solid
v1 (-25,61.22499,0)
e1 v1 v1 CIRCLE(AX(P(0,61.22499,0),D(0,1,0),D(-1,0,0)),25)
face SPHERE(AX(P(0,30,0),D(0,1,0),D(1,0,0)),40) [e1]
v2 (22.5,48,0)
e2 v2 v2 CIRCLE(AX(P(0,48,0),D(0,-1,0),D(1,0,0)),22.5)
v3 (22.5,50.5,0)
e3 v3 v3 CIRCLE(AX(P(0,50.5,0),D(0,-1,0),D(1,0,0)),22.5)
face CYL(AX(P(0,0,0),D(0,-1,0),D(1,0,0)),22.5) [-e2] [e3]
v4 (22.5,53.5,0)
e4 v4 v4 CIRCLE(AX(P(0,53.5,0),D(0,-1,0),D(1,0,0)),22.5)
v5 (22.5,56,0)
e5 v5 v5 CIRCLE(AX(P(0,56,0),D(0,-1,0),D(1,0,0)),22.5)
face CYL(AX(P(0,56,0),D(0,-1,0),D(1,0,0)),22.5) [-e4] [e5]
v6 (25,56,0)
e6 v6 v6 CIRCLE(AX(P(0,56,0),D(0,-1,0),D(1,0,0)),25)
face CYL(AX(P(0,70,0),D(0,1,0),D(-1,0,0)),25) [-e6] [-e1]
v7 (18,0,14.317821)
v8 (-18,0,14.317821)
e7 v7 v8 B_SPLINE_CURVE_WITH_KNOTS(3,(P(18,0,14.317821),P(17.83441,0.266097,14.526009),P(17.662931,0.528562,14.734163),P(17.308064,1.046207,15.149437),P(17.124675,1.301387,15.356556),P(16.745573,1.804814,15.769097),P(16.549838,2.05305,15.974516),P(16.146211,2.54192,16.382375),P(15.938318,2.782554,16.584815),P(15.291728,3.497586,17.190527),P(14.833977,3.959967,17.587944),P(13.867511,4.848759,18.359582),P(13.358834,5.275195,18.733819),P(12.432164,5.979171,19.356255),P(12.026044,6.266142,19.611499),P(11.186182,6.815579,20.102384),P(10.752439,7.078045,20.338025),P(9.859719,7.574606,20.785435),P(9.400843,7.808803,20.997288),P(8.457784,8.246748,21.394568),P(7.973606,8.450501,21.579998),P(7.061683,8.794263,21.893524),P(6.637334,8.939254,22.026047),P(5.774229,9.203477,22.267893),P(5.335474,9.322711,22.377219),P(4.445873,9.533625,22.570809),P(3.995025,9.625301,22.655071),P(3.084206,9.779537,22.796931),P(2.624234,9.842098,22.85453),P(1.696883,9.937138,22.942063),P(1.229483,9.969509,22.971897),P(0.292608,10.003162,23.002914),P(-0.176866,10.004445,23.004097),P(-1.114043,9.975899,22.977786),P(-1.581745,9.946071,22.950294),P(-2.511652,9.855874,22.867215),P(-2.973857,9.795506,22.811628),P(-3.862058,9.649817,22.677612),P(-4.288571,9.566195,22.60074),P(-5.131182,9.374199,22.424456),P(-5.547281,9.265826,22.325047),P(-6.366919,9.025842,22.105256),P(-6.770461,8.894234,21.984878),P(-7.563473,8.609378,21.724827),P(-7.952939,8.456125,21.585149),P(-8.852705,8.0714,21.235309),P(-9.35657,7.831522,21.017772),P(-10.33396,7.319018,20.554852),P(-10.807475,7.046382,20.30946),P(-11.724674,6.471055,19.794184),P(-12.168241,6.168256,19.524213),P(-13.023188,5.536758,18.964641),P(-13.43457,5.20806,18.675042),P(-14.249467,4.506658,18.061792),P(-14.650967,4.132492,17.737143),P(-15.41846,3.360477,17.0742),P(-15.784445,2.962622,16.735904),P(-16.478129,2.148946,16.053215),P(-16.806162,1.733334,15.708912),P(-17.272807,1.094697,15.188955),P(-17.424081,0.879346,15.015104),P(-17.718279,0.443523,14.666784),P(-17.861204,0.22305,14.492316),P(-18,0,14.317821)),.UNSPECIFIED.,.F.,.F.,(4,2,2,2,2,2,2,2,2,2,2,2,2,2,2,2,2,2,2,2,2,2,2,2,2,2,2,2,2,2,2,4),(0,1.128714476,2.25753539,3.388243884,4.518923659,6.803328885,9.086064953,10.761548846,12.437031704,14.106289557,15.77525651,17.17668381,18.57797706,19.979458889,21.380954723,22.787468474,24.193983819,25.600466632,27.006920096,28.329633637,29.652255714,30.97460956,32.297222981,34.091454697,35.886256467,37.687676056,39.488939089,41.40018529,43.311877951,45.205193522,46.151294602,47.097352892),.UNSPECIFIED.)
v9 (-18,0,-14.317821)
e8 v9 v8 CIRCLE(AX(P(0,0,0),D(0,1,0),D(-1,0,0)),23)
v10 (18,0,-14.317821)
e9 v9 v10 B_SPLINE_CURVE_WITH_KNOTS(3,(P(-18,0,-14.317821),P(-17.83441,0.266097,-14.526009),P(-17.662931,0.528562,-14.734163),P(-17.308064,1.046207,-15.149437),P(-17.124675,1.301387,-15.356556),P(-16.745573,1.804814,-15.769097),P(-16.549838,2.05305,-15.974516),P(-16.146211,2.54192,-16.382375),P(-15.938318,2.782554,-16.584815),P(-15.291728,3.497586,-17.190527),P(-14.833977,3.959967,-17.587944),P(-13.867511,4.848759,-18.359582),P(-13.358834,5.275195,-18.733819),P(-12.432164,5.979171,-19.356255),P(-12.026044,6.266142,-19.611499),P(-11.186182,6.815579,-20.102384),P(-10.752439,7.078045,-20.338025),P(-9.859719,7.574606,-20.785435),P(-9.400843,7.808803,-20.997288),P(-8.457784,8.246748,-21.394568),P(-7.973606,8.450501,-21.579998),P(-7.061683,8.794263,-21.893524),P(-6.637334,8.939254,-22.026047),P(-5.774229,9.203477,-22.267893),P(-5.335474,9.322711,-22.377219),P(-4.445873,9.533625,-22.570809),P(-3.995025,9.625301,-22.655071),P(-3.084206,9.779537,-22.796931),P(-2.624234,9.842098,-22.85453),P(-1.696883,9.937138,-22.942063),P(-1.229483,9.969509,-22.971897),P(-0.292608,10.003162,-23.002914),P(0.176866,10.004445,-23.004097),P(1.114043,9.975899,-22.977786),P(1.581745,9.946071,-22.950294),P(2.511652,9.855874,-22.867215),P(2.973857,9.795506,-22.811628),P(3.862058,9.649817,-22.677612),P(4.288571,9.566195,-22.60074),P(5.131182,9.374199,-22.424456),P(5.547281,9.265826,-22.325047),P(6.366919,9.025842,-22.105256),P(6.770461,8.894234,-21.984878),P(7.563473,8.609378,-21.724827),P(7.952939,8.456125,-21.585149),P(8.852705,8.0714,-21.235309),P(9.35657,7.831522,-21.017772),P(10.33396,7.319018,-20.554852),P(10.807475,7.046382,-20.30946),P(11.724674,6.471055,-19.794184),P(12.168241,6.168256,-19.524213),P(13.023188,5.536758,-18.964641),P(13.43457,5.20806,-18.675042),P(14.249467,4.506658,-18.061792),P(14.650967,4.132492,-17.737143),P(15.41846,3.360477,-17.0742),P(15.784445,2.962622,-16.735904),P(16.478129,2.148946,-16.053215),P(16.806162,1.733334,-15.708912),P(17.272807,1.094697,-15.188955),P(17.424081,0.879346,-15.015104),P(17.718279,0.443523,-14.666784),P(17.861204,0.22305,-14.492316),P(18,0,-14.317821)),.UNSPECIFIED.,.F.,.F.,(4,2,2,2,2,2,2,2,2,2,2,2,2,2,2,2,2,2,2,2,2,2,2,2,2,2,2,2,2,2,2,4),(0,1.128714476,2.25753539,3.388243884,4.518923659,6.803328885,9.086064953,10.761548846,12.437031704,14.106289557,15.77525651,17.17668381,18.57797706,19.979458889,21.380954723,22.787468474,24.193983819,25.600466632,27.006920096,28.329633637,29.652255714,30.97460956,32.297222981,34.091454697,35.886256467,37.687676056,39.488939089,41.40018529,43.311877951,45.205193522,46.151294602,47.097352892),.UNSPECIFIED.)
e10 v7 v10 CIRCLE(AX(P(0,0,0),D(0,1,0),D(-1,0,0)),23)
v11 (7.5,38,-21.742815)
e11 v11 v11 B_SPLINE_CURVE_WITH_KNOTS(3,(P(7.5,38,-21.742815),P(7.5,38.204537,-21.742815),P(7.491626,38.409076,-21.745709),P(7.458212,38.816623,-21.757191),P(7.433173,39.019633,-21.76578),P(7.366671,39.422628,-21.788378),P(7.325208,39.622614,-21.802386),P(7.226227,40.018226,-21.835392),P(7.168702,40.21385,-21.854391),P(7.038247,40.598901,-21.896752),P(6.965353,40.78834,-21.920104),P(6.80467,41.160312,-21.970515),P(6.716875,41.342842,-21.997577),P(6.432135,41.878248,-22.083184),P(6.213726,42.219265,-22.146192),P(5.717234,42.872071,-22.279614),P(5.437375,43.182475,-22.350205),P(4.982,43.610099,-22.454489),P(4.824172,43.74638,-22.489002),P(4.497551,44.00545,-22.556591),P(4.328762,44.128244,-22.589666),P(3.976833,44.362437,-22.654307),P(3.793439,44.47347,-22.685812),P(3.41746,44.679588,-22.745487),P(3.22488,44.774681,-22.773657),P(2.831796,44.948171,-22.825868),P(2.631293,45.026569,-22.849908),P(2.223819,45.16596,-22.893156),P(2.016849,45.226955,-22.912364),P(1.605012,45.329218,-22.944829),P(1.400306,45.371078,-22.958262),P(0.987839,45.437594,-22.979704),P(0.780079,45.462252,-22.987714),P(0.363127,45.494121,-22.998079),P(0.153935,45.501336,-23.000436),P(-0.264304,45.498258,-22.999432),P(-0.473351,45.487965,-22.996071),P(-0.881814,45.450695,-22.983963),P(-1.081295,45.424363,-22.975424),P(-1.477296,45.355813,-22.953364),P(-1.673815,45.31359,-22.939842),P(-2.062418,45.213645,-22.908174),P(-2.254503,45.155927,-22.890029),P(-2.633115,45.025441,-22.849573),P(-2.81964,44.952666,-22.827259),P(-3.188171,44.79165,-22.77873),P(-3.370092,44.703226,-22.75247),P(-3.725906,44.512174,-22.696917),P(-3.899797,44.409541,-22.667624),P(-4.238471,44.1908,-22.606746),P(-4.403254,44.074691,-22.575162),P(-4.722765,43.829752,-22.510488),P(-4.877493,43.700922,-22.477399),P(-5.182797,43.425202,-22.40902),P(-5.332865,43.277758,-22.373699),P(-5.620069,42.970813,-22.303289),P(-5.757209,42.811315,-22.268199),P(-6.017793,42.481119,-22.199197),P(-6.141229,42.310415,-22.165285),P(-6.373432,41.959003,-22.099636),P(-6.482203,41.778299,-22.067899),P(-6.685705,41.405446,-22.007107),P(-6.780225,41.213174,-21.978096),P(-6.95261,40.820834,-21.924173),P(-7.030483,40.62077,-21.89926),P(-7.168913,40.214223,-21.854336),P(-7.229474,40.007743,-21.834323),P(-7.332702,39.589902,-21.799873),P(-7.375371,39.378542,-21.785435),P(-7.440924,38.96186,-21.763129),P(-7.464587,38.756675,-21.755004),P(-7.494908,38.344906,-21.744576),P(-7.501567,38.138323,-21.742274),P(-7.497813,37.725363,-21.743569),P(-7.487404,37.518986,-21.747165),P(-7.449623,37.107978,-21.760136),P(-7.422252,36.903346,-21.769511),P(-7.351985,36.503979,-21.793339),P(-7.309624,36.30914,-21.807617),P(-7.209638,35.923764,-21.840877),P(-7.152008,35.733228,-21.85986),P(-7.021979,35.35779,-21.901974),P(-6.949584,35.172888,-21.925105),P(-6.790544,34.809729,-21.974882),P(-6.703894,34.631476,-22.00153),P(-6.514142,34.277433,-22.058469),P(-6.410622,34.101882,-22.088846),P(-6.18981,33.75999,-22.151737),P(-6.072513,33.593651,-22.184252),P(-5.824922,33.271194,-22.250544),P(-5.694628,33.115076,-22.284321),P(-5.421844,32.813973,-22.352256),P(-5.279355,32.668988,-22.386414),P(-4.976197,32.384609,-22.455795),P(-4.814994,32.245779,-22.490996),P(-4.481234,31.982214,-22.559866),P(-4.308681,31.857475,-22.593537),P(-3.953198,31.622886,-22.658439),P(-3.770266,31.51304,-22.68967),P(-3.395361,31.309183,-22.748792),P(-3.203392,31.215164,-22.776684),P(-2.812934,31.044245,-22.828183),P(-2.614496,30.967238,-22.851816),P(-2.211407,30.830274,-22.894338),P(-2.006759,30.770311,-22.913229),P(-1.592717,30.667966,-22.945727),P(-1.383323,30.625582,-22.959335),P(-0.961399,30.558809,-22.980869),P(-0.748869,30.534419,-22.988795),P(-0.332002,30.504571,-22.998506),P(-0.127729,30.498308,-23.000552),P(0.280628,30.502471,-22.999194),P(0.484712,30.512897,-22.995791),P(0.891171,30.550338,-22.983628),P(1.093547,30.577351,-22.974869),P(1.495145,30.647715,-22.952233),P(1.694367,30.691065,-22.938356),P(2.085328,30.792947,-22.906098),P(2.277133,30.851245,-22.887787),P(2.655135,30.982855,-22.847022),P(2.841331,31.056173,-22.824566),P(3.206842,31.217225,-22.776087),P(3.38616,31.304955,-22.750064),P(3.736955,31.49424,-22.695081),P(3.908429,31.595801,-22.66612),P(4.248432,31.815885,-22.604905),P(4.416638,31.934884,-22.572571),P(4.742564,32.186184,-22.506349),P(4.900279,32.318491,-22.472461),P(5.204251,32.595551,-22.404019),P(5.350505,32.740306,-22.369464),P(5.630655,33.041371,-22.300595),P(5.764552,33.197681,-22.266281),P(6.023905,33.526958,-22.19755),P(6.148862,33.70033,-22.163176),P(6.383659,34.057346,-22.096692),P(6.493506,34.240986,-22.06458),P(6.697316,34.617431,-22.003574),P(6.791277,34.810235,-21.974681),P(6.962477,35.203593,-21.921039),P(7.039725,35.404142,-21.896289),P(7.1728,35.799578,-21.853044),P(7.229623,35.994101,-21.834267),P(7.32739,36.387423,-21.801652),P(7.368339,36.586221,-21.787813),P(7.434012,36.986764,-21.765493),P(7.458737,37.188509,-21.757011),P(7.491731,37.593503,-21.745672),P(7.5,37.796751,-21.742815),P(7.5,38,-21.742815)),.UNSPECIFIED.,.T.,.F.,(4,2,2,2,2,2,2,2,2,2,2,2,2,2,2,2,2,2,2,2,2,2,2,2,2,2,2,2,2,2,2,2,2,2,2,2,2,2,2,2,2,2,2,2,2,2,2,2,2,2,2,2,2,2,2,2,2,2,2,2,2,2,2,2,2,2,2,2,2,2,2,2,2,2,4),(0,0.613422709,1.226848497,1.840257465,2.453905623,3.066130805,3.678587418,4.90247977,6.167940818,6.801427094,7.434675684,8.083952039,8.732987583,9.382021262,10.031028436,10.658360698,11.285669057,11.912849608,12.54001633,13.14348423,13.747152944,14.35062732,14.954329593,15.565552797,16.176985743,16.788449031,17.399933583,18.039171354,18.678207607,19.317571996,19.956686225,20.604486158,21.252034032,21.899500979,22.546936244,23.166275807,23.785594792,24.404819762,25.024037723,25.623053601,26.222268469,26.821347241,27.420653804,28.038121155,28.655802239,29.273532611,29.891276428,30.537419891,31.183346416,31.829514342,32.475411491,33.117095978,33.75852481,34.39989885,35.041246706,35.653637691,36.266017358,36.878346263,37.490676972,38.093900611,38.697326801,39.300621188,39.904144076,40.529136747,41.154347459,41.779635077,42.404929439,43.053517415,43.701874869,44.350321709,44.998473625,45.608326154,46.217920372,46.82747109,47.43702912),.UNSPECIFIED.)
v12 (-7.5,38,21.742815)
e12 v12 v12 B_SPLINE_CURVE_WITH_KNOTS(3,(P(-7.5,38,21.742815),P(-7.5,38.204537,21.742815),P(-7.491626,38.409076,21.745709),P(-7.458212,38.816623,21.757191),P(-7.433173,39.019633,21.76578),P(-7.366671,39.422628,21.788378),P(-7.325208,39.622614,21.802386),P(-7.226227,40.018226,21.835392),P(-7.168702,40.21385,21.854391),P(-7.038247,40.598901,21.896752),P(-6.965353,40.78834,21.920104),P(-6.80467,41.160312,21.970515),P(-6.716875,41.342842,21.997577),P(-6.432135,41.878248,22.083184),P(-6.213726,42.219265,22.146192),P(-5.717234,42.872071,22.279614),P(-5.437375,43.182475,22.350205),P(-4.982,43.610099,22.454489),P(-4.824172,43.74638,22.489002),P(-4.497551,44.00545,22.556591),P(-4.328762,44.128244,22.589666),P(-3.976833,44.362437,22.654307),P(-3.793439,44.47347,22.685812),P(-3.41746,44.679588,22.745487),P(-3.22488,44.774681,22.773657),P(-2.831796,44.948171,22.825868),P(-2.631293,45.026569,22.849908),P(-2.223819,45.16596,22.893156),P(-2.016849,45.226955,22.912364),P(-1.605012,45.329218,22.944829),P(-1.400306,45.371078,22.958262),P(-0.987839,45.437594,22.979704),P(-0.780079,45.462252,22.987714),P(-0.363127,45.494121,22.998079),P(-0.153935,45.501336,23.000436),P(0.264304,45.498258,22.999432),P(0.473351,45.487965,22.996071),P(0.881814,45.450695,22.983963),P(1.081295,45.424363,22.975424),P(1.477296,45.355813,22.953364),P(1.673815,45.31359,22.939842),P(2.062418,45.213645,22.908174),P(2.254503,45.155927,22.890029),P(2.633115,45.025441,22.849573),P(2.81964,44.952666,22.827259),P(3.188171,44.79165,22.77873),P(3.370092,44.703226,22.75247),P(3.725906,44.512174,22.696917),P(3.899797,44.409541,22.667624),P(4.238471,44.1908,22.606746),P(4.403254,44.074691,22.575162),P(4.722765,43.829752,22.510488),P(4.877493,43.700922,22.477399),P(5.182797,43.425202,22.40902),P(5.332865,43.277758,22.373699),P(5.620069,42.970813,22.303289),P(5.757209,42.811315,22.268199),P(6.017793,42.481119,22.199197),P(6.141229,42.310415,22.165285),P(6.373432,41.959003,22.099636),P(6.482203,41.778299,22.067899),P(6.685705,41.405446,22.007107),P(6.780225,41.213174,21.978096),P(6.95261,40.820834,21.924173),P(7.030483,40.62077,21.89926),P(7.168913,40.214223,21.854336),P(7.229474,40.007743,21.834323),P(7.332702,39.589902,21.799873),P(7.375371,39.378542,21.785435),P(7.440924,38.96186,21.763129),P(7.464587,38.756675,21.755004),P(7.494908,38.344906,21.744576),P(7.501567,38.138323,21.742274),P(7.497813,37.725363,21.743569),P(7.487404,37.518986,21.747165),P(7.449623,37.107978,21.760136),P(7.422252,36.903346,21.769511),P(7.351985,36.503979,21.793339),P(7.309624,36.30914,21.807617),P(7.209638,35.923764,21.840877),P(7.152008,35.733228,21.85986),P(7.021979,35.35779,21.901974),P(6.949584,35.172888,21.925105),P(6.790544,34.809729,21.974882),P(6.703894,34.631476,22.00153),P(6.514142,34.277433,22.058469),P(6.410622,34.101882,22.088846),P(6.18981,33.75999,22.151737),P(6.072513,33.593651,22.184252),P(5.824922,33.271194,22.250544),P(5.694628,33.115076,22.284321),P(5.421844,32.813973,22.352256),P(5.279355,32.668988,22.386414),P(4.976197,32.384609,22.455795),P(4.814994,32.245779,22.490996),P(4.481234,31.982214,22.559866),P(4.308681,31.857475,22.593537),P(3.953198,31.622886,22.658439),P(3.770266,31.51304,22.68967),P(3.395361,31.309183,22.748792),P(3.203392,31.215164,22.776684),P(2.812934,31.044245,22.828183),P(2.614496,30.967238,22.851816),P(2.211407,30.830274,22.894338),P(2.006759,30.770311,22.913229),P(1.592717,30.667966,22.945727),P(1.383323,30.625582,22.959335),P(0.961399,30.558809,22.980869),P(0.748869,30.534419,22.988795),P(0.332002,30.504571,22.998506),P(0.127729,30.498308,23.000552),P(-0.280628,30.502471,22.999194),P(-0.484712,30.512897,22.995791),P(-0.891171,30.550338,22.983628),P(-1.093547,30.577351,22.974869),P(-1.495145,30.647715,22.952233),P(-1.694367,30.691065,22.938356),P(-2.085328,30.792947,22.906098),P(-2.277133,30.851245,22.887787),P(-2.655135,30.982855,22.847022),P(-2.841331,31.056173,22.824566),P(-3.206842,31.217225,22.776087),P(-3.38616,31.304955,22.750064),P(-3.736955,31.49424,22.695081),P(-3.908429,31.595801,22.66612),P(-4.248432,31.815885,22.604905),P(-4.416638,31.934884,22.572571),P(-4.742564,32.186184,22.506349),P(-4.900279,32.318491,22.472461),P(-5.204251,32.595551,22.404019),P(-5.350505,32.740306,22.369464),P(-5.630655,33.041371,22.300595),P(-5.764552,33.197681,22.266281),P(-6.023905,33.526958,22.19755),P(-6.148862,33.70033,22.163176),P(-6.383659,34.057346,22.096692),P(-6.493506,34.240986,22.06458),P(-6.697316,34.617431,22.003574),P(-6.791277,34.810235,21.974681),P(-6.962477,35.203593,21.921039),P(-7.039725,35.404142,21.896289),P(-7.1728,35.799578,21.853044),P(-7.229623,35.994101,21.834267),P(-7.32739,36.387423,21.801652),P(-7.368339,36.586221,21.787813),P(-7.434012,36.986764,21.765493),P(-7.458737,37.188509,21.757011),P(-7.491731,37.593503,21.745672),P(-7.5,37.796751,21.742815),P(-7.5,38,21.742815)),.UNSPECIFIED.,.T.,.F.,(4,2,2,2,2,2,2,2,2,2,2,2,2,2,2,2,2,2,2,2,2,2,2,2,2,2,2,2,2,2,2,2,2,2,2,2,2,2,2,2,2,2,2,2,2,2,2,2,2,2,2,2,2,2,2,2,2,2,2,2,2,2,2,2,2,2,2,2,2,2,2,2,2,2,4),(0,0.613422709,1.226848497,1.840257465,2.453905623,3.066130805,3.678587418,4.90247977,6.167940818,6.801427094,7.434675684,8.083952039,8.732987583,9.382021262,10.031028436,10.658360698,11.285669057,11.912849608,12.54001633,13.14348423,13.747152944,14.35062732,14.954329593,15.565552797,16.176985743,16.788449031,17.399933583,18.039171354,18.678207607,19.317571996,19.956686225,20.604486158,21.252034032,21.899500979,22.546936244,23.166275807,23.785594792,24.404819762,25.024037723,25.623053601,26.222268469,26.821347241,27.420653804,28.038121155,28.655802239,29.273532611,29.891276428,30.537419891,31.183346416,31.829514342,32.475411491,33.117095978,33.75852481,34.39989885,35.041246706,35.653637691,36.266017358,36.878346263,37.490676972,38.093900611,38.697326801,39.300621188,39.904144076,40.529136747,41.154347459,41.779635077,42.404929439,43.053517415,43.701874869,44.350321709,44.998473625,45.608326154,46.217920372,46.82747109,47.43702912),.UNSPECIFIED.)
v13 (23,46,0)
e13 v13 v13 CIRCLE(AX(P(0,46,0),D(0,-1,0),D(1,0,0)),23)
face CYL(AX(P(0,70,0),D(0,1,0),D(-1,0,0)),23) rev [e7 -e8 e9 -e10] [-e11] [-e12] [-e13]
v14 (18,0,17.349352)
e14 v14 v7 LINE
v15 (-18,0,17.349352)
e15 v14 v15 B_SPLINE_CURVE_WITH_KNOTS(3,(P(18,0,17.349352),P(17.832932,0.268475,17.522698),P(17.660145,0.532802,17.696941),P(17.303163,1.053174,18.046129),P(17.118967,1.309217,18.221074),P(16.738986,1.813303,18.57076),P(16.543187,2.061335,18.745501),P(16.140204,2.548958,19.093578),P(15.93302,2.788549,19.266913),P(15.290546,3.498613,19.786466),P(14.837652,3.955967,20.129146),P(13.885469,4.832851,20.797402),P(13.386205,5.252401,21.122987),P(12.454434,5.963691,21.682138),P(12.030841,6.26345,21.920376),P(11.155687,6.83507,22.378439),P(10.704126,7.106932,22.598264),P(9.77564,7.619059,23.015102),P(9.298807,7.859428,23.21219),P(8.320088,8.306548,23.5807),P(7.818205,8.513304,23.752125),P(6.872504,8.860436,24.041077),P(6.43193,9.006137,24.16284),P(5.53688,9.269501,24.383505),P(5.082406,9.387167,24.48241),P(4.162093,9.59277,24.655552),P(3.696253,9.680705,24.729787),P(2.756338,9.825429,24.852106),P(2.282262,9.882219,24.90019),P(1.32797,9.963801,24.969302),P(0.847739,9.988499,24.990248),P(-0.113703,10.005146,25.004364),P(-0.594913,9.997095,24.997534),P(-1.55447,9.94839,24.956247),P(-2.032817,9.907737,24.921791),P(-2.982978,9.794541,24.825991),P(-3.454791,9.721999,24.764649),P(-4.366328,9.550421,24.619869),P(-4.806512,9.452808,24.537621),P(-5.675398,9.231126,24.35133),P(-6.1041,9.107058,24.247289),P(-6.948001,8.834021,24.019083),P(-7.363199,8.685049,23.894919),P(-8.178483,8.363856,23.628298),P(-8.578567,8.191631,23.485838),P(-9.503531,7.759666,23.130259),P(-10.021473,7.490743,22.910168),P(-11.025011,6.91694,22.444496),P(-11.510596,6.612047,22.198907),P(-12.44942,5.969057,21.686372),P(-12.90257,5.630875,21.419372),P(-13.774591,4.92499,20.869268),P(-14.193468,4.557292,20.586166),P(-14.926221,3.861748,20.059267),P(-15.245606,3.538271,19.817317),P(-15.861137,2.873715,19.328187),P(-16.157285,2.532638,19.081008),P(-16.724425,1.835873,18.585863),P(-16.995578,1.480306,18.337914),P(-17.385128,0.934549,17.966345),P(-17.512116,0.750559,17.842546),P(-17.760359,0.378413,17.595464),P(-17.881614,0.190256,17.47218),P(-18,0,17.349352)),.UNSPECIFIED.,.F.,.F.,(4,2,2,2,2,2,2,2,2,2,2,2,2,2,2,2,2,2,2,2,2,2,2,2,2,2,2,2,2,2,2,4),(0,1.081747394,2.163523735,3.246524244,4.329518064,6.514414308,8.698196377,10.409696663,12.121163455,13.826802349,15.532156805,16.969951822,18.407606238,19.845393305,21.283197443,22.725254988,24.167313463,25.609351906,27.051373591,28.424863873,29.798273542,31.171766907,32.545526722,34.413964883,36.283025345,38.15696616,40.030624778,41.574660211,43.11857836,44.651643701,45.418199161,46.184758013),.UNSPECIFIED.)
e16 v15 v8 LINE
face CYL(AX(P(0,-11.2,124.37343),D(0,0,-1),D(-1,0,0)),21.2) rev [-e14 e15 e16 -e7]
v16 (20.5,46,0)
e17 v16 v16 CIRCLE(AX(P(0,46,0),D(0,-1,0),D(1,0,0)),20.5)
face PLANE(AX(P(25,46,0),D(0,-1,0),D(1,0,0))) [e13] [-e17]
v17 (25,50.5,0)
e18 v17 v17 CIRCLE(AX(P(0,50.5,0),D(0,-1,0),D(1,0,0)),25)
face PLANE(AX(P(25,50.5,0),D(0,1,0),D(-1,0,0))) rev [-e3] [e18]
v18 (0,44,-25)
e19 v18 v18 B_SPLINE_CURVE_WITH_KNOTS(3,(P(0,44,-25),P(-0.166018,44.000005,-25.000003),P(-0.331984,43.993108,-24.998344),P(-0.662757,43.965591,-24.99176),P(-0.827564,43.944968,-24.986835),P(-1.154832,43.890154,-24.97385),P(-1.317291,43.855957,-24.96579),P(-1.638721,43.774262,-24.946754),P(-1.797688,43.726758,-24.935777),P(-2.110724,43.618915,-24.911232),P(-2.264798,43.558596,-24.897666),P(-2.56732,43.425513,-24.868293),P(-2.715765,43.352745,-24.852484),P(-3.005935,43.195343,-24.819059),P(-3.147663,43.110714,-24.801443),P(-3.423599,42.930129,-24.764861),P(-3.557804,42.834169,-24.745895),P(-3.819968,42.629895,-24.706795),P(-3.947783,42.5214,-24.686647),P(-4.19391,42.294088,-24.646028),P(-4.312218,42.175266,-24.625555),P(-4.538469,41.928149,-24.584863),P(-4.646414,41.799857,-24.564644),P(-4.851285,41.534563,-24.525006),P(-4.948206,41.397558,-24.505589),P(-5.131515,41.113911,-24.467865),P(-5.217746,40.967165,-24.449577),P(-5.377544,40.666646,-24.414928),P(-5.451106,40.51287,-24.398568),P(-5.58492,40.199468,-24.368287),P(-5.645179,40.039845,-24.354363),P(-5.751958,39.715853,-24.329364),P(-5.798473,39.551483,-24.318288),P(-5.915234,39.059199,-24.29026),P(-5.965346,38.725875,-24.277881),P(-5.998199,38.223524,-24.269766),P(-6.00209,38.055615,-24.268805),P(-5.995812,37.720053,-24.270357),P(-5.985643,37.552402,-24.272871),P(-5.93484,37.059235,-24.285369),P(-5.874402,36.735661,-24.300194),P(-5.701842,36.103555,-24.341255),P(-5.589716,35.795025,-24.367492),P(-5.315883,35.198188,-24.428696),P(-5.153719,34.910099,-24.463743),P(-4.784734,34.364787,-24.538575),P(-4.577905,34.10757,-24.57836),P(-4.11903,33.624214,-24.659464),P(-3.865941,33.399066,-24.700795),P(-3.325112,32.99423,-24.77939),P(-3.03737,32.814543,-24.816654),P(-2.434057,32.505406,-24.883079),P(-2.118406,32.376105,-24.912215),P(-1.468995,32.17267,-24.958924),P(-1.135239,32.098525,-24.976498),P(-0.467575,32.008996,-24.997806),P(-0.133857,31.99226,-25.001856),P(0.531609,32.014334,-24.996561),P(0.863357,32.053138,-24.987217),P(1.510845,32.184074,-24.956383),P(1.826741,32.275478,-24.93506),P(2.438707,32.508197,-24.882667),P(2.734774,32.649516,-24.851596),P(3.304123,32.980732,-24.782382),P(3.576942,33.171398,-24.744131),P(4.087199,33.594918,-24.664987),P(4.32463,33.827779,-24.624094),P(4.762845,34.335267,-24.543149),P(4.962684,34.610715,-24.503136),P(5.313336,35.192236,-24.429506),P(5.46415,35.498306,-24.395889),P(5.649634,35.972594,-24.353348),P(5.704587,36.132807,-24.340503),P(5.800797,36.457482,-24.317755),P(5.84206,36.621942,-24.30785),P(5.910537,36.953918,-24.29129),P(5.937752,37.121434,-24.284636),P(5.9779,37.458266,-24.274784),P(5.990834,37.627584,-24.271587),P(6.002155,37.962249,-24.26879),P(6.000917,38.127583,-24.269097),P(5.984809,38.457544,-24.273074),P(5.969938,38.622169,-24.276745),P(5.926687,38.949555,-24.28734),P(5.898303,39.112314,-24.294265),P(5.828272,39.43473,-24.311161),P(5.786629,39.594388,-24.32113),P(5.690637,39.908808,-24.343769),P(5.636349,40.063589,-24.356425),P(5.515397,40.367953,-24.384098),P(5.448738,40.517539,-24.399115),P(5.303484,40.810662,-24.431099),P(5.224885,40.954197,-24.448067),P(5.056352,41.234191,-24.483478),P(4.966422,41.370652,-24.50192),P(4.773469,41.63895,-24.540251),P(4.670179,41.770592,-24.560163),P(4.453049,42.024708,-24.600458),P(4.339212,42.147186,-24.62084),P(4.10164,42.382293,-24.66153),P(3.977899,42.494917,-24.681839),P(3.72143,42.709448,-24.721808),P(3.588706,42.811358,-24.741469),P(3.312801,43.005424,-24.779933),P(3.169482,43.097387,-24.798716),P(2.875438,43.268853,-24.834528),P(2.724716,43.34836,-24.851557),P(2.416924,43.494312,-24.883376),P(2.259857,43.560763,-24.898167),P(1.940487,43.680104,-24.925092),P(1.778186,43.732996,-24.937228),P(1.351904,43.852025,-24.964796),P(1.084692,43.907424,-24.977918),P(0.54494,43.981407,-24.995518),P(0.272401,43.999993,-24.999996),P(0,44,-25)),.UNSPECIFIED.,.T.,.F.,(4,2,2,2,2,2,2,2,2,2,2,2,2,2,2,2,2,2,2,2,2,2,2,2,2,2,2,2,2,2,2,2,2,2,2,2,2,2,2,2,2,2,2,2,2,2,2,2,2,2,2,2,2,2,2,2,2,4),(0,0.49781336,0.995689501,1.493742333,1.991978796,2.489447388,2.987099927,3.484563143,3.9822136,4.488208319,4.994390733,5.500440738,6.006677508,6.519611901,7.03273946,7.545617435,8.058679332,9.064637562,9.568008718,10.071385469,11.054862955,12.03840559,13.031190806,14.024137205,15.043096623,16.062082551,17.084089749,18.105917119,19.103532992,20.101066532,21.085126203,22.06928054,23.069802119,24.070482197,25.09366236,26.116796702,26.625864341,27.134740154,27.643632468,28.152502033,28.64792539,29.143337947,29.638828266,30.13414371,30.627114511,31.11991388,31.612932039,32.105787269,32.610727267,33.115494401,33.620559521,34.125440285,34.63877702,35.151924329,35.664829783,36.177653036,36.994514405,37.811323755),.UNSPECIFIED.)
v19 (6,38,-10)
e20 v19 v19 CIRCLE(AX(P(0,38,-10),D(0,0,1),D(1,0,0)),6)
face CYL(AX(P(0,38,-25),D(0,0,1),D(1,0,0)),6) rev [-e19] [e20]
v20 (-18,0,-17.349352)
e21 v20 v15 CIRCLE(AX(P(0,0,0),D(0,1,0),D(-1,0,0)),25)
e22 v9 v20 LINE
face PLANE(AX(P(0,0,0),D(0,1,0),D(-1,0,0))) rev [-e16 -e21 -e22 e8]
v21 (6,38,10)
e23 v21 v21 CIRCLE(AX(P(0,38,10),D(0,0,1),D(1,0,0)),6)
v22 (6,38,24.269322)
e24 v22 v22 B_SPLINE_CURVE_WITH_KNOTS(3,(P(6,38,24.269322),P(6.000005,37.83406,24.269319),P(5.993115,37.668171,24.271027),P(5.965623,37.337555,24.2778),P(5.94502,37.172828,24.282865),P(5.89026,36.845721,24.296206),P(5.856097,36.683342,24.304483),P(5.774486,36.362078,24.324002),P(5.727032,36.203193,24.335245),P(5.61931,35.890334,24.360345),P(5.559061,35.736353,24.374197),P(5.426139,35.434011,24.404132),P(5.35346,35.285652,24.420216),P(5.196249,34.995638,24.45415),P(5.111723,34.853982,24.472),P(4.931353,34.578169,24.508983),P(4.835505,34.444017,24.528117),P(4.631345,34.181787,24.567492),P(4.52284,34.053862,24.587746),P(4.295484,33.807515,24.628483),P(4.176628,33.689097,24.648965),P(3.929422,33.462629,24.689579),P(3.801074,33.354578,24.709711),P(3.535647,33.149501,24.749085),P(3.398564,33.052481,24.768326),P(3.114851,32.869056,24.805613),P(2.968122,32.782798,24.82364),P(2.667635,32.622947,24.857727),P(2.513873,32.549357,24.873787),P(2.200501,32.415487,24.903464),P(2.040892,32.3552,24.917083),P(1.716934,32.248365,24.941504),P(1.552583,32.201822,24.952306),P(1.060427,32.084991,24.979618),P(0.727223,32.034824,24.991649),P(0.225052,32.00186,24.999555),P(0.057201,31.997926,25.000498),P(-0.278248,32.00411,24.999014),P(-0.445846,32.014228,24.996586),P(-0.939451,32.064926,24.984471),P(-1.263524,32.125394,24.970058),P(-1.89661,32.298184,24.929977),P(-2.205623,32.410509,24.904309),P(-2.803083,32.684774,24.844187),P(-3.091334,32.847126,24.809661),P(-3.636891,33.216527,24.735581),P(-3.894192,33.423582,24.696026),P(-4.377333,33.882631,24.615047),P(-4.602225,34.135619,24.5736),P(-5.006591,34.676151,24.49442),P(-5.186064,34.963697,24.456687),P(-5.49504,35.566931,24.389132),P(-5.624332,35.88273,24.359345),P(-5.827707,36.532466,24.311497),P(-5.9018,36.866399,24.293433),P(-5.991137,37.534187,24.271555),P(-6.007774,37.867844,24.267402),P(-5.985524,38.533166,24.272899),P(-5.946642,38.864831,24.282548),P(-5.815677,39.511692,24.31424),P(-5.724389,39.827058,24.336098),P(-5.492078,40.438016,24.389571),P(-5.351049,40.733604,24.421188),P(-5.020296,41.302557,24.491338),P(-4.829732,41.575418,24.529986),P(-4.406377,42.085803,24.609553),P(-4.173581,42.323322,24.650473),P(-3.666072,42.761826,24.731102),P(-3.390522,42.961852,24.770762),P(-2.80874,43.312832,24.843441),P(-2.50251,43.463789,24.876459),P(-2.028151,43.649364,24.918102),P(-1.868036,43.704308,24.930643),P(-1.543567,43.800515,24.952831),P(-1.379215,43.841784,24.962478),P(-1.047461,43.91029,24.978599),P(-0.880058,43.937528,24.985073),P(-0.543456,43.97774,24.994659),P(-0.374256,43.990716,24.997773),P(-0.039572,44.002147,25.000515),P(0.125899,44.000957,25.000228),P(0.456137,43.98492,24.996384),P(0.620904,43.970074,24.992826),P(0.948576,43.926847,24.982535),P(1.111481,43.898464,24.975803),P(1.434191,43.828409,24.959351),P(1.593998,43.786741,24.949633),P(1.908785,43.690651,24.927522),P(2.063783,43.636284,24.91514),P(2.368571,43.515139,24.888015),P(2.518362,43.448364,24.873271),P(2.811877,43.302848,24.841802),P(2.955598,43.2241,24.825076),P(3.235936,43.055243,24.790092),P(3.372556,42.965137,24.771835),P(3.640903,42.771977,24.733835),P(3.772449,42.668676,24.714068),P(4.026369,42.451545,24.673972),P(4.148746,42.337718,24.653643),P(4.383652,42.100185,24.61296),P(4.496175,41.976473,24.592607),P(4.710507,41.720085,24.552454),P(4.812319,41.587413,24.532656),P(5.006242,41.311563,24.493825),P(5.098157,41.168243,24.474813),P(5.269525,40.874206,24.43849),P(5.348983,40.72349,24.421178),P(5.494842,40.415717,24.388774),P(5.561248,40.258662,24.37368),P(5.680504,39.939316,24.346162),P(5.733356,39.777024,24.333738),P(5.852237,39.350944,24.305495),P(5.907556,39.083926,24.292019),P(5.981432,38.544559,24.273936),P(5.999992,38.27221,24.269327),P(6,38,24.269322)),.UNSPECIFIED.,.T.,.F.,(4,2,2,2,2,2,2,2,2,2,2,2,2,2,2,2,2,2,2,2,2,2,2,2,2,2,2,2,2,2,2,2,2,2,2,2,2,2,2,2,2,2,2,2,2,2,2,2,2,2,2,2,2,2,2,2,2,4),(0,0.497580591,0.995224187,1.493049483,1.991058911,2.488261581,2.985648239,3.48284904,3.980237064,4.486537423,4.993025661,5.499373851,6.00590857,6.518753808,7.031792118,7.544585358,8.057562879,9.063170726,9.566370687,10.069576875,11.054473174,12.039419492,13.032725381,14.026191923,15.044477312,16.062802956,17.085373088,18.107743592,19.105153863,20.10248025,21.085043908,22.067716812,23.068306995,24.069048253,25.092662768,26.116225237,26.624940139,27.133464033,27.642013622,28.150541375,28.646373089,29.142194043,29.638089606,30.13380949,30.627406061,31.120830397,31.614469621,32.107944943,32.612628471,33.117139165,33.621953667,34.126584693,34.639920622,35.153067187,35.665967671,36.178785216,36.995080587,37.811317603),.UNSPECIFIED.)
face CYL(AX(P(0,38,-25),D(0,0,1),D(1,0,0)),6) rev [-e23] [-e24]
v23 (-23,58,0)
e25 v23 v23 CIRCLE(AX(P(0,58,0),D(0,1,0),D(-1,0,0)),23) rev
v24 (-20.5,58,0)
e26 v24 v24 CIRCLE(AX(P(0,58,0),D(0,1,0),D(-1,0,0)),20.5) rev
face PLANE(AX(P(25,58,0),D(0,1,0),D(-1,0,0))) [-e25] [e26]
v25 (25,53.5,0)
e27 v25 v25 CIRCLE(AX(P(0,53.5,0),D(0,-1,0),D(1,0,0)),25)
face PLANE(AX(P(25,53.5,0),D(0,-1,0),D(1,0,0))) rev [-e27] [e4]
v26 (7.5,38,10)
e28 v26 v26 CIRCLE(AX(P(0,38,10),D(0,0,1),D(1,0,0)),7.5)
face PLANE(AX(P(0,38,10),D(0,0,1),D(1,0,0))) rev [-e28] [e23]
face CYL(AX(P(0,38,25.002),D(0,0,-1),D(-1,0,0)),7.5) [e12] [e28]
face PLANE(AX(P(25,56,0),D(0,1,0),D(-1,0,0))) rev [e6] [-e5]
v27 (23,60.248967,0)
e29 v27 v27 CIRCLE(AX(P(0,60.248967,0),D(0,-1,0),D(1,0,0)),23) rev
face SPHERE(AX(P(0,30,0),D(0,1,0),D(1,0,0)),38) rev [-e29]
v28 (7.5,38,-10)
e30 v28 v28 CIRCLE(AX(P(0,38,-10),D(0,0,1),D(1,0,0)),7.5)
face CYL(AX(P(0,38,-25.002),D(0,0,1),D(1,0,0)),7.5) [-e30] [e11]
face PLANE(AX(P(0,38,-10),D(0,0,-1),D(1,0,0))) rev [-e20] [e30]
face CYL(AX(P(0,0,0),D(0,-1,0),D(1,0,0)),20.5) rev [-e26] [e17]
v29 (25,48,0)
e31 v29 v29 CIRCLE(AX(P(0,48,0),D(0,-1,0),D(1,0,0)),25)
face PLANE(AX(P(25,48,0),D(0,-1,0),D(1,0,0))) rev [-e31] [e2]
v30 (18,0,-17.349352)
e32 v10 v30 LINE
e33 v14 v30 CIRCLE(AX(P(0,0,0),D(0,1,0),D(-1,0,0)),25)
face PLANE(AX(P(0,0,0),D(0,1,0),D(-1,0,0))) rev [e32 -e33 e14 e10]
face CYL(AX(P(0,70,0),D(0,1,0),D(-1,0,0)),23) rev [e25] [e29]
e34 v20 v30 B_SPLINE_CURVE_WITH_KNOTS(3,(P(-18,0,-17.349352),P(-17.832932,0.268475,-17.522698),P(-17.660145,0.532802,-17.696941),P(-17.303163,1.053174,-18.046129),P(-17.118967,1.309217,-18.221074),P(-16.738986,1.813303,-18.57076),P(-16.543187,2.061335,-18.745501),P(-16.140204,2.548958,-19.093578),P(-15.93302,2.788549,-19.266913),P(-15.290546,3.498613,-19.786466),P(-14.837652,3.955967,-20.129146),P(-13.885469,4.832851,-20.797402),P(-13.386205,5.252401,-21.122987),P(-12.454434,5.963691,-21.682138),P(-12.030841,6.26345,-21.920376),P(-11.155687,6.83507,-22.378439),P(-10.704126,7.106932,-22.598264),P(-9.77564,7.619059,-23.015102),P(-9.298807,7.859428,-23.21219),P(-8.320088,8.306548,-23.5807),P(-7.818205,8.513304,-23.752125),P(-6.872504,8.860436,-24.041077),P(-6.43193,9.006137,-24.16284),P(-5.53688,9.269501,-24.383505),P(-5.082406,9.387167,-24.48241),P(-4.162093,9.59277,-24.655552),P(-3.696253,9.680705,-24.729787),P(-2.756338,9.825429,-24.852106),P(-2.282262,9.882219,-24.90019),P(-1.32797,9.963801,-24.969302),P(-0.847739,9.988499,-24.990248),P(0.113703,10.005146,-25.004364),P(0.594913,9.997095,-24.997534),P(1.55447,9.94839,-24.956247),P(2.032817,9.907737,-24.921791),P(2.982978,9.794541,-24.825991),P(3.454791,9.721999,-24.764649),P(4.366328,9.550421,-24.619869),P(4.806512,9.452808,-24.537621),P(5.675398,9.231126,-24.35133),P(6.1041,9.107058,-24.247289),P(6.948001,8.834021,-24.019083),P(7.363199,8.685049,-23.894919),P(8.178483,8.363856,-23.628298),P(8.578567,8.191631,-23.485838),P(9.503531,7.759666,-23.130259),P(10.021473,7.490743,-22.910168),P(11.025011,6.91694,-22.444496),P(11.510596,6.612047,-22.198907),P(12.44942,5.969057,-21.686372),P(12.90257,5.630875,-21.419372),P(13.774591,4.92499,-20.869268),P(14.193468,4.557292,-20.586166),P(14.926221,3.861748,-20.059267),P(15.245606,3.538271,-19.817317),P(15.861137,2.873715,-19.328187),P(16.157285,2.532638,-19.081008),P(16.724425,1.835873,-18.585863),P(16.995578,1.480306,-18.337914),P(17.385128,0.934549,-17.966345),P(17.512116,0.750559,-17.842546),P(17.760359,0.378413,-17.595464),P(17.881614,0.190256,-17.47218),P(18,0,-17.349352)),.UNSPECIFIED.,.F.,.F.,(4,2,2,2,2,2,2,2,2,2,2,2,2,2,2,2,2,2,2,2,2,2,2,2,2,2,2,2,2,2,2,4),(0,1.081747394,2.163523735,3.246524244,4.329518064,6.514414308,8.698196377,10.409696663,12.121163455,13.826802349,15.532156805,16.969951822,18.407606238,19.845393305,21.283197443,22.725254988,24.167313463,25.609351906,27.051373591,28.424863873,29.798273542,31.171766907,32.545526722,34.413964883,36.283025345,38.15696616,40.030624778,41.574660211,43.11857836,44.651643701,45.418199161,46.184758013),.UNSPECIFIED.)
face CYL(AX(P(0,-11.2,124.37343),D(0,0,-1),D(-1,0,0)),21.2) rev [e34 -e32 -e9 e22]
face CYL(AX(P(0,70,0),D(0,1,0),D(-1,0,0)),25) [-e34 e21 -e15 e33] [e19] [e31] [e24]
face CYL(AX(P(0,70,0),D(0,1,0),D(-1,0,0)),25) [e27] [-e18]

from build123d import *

# Parameters (mm, degrees)
SZKIC2_W                         = 2.5
SZKIC2_H                         = 2.5
SZYK_LINIOWY1_COUNT              = 2
SZYK_LINIOWY1_PITCH              = 5.5
WYTNIJ_WYCI_GNI_CIE3_DEPTH       = 79.421935707
WYTNIJ_WYCI_GNI_CIE3_DEPTH_BACK  = 79.421935707
WYTNIJ_WYCI_GNI_CIE4_DEPTH       = 79.421935771
WYTNIJ_WYCI_GNI_CIE4_DEPTH_BACK  = 79.421935771
SZKIC4_R                         = 6
DODANIE_WYCI_GNI_CIE2_REACH      = 90.422
DODANIE_WYCI_GNI_CIE2_END_RADIUS = 23
DODANIE_WYCI_GNI_CIE2_START      = 10
SZKIC5_R                         = 7.5
SZKIC5_R_2                       = 6


# Read off the part's stored shape, not the designer's step: Skorupa3
with BuildPart() as part:
    # Szkic1 → Obrót1 (revolve)
    with BuildSketch(Plane.XY, mode=Mode.PRIVATE) as obr_t1_sk:
        with BuildLine():
            Line((0, 0), (25, 0))
            Line((25, 0), (25, 61.224989992))
            ThreePointArc((25, 61.224989992), (13.247648854, 67.742546282), (0, 70))
            Line((0, 70), (0, 0))
        make_face()
    revolve(obr_t1_sk.sketch.rotate(Axis((0, 70, 0), (0, -1, 0)), 180), axis=Axis((0, 70, 0), (0, -1, 0)))

    # Szkic2 → Wycięcie-obrót1 (revolve, cut)
    with BuildSketch(Plane.XY):
        with Locations((23.75, 49.25)):
            Rectangle(SZKIC2_W, SZKIC2_H)
    wyci_cie_obr_t1 = revolve(axis=Axis((0, 70, 0), (0, 1, 0)), mode=Mode.SUBTRACT)

    # Szyk liniowy1: Wycięcie-obrót1 ×2
    with Locations(*[(0, i * SZYK_LINIOWY1_PITCH, 0) for i in range(1, SZYK_LINIOWY1_COUNT)]):
        add(wyci_cie_obr_t1, mode=Mode.SUBTRACT)

    # Skorupa3 outline → Skorupa3 (revolve, cut)
    with BuildSketch(Plane.XY):
        with BuildLine():
            Line((23, 0), (23, 46))
            Line((23, 46), (20.5, 46))
            Line((20.5, 46), (20.5, 58))
            Line((20.5, 58), (23, 58))
            Line((23, 58), (23.00000001, 60.248966917))
            ThreePointArc((23.00000001, 60.248966917), (12.135469854, 66.010142619), (0, 68))
            Line((0, 68), (0, 0))
            Line((0, 0), (23, 0))
        make_face()
    revolve(axis=Axis((0, 0, 0), (0, 1, 0)), mode=Mode.SUBTRACT)

    # Szkic3 → Wytnij-wyciągnięcie3 (cut, two sides: drawn at the far end of the back side and taken through both)
    with BuildSketch(Plane.XY.offset(-WYTNIJ_WYCI_GNI_CIE3_DEPTH_BACK)):
        with BuildLine():
            Line((110.085446515, -147.994467613), (18, 0))
            ThreePointArc((18, 0), (0, 10), (-18, 0))
            Line((-18, 0), (-110.085446515, -147.994467613))
            Line((-110.085446515, -147.994467613), (-110.085446515, -496.603657989))
            Line((-110.085446515, -496.603657989), (110.085446515, -496.603657989))
            Line((110.085446515, -496.603657989), (110.085446515, -147.994467613))
        make_face()
    extrude(amount=WYTNIJ_WYCI_GNI_CIE3_DEPTH + WYTNIJ_WYCI_GNI_CIE3_DEPTH_BACK, mode=Mode.SUBTRACT)

    # Szkic4 → Wytnij-wyciągnięcie4 (cut, two sides: drawn at the far end of the back side and taken through both)
    with BuildSketch(Plane.XY.offset(-WYTNIJ_WYCI_GNI_CIE4_DEPTH_BACK)):
        with Locations((0, 38)):
            Circle(SZKIC4_R)
    extrude(amount=WYTNIJ_WYCI_GNI_CIE4_DEPTH + WYTNIJ_WYCI_GNI_CIE4_DEPTH_BACK, mode=Mode.SUBTRACT)

    # Dodanie-wyciągnięcie2: up to this cylinder (the profile starts inside it)
    dodanie_wyci_gni_cie2_end = Plane(origin=(0, 38, 0), z_dir=(0, 1, 0)) * Cylinder(DODANIE_WYCI_GNI_CIE2_END_RADIUS, 227.844, mode=Mode.PRIVATE)
    # Szkic5 → Dodanie-wyciągnięcie2 (add, up to the surface)
    with BuildSketch(Plane.XY.offset(DODANIE_WYCI_GNI_CIE2_START), mode=Mode.PRIVATE) as dodanie_wyci_gni_cie2_sk1:
        with Locations(Location((0, 38, 0), (0, 0, 180))):
            Circle(SZKIC5_R)
        with Locations((0, 38)):
            Circle(SZKIC5_R_2, mode=Mode.SUBTRACT)
    dodanie_wyci_gni_cie2_tool1 = extrude(dodanie_wyci_gni_cie2_sk1.sketch, amount=DODANIE_WYCI_GNI_CIE2_REACH, mode=Mode.PRIVATE) & dodanie_wyci_gni_cie2_end
    dodanie_wyci_gni_cie2 = dodanie_wyci_gni_cie2_tool1.solids().sort_by_distance((7.287868, 38, 10))[0]
    add(dodanie_wyci_gni_cie2)

    # Lustro1: Dodanie-wyciągnięcie2 across plane
    add(dodanie_wyci_gni_cie2.mirror(Plane.XY))


solid = part.part
